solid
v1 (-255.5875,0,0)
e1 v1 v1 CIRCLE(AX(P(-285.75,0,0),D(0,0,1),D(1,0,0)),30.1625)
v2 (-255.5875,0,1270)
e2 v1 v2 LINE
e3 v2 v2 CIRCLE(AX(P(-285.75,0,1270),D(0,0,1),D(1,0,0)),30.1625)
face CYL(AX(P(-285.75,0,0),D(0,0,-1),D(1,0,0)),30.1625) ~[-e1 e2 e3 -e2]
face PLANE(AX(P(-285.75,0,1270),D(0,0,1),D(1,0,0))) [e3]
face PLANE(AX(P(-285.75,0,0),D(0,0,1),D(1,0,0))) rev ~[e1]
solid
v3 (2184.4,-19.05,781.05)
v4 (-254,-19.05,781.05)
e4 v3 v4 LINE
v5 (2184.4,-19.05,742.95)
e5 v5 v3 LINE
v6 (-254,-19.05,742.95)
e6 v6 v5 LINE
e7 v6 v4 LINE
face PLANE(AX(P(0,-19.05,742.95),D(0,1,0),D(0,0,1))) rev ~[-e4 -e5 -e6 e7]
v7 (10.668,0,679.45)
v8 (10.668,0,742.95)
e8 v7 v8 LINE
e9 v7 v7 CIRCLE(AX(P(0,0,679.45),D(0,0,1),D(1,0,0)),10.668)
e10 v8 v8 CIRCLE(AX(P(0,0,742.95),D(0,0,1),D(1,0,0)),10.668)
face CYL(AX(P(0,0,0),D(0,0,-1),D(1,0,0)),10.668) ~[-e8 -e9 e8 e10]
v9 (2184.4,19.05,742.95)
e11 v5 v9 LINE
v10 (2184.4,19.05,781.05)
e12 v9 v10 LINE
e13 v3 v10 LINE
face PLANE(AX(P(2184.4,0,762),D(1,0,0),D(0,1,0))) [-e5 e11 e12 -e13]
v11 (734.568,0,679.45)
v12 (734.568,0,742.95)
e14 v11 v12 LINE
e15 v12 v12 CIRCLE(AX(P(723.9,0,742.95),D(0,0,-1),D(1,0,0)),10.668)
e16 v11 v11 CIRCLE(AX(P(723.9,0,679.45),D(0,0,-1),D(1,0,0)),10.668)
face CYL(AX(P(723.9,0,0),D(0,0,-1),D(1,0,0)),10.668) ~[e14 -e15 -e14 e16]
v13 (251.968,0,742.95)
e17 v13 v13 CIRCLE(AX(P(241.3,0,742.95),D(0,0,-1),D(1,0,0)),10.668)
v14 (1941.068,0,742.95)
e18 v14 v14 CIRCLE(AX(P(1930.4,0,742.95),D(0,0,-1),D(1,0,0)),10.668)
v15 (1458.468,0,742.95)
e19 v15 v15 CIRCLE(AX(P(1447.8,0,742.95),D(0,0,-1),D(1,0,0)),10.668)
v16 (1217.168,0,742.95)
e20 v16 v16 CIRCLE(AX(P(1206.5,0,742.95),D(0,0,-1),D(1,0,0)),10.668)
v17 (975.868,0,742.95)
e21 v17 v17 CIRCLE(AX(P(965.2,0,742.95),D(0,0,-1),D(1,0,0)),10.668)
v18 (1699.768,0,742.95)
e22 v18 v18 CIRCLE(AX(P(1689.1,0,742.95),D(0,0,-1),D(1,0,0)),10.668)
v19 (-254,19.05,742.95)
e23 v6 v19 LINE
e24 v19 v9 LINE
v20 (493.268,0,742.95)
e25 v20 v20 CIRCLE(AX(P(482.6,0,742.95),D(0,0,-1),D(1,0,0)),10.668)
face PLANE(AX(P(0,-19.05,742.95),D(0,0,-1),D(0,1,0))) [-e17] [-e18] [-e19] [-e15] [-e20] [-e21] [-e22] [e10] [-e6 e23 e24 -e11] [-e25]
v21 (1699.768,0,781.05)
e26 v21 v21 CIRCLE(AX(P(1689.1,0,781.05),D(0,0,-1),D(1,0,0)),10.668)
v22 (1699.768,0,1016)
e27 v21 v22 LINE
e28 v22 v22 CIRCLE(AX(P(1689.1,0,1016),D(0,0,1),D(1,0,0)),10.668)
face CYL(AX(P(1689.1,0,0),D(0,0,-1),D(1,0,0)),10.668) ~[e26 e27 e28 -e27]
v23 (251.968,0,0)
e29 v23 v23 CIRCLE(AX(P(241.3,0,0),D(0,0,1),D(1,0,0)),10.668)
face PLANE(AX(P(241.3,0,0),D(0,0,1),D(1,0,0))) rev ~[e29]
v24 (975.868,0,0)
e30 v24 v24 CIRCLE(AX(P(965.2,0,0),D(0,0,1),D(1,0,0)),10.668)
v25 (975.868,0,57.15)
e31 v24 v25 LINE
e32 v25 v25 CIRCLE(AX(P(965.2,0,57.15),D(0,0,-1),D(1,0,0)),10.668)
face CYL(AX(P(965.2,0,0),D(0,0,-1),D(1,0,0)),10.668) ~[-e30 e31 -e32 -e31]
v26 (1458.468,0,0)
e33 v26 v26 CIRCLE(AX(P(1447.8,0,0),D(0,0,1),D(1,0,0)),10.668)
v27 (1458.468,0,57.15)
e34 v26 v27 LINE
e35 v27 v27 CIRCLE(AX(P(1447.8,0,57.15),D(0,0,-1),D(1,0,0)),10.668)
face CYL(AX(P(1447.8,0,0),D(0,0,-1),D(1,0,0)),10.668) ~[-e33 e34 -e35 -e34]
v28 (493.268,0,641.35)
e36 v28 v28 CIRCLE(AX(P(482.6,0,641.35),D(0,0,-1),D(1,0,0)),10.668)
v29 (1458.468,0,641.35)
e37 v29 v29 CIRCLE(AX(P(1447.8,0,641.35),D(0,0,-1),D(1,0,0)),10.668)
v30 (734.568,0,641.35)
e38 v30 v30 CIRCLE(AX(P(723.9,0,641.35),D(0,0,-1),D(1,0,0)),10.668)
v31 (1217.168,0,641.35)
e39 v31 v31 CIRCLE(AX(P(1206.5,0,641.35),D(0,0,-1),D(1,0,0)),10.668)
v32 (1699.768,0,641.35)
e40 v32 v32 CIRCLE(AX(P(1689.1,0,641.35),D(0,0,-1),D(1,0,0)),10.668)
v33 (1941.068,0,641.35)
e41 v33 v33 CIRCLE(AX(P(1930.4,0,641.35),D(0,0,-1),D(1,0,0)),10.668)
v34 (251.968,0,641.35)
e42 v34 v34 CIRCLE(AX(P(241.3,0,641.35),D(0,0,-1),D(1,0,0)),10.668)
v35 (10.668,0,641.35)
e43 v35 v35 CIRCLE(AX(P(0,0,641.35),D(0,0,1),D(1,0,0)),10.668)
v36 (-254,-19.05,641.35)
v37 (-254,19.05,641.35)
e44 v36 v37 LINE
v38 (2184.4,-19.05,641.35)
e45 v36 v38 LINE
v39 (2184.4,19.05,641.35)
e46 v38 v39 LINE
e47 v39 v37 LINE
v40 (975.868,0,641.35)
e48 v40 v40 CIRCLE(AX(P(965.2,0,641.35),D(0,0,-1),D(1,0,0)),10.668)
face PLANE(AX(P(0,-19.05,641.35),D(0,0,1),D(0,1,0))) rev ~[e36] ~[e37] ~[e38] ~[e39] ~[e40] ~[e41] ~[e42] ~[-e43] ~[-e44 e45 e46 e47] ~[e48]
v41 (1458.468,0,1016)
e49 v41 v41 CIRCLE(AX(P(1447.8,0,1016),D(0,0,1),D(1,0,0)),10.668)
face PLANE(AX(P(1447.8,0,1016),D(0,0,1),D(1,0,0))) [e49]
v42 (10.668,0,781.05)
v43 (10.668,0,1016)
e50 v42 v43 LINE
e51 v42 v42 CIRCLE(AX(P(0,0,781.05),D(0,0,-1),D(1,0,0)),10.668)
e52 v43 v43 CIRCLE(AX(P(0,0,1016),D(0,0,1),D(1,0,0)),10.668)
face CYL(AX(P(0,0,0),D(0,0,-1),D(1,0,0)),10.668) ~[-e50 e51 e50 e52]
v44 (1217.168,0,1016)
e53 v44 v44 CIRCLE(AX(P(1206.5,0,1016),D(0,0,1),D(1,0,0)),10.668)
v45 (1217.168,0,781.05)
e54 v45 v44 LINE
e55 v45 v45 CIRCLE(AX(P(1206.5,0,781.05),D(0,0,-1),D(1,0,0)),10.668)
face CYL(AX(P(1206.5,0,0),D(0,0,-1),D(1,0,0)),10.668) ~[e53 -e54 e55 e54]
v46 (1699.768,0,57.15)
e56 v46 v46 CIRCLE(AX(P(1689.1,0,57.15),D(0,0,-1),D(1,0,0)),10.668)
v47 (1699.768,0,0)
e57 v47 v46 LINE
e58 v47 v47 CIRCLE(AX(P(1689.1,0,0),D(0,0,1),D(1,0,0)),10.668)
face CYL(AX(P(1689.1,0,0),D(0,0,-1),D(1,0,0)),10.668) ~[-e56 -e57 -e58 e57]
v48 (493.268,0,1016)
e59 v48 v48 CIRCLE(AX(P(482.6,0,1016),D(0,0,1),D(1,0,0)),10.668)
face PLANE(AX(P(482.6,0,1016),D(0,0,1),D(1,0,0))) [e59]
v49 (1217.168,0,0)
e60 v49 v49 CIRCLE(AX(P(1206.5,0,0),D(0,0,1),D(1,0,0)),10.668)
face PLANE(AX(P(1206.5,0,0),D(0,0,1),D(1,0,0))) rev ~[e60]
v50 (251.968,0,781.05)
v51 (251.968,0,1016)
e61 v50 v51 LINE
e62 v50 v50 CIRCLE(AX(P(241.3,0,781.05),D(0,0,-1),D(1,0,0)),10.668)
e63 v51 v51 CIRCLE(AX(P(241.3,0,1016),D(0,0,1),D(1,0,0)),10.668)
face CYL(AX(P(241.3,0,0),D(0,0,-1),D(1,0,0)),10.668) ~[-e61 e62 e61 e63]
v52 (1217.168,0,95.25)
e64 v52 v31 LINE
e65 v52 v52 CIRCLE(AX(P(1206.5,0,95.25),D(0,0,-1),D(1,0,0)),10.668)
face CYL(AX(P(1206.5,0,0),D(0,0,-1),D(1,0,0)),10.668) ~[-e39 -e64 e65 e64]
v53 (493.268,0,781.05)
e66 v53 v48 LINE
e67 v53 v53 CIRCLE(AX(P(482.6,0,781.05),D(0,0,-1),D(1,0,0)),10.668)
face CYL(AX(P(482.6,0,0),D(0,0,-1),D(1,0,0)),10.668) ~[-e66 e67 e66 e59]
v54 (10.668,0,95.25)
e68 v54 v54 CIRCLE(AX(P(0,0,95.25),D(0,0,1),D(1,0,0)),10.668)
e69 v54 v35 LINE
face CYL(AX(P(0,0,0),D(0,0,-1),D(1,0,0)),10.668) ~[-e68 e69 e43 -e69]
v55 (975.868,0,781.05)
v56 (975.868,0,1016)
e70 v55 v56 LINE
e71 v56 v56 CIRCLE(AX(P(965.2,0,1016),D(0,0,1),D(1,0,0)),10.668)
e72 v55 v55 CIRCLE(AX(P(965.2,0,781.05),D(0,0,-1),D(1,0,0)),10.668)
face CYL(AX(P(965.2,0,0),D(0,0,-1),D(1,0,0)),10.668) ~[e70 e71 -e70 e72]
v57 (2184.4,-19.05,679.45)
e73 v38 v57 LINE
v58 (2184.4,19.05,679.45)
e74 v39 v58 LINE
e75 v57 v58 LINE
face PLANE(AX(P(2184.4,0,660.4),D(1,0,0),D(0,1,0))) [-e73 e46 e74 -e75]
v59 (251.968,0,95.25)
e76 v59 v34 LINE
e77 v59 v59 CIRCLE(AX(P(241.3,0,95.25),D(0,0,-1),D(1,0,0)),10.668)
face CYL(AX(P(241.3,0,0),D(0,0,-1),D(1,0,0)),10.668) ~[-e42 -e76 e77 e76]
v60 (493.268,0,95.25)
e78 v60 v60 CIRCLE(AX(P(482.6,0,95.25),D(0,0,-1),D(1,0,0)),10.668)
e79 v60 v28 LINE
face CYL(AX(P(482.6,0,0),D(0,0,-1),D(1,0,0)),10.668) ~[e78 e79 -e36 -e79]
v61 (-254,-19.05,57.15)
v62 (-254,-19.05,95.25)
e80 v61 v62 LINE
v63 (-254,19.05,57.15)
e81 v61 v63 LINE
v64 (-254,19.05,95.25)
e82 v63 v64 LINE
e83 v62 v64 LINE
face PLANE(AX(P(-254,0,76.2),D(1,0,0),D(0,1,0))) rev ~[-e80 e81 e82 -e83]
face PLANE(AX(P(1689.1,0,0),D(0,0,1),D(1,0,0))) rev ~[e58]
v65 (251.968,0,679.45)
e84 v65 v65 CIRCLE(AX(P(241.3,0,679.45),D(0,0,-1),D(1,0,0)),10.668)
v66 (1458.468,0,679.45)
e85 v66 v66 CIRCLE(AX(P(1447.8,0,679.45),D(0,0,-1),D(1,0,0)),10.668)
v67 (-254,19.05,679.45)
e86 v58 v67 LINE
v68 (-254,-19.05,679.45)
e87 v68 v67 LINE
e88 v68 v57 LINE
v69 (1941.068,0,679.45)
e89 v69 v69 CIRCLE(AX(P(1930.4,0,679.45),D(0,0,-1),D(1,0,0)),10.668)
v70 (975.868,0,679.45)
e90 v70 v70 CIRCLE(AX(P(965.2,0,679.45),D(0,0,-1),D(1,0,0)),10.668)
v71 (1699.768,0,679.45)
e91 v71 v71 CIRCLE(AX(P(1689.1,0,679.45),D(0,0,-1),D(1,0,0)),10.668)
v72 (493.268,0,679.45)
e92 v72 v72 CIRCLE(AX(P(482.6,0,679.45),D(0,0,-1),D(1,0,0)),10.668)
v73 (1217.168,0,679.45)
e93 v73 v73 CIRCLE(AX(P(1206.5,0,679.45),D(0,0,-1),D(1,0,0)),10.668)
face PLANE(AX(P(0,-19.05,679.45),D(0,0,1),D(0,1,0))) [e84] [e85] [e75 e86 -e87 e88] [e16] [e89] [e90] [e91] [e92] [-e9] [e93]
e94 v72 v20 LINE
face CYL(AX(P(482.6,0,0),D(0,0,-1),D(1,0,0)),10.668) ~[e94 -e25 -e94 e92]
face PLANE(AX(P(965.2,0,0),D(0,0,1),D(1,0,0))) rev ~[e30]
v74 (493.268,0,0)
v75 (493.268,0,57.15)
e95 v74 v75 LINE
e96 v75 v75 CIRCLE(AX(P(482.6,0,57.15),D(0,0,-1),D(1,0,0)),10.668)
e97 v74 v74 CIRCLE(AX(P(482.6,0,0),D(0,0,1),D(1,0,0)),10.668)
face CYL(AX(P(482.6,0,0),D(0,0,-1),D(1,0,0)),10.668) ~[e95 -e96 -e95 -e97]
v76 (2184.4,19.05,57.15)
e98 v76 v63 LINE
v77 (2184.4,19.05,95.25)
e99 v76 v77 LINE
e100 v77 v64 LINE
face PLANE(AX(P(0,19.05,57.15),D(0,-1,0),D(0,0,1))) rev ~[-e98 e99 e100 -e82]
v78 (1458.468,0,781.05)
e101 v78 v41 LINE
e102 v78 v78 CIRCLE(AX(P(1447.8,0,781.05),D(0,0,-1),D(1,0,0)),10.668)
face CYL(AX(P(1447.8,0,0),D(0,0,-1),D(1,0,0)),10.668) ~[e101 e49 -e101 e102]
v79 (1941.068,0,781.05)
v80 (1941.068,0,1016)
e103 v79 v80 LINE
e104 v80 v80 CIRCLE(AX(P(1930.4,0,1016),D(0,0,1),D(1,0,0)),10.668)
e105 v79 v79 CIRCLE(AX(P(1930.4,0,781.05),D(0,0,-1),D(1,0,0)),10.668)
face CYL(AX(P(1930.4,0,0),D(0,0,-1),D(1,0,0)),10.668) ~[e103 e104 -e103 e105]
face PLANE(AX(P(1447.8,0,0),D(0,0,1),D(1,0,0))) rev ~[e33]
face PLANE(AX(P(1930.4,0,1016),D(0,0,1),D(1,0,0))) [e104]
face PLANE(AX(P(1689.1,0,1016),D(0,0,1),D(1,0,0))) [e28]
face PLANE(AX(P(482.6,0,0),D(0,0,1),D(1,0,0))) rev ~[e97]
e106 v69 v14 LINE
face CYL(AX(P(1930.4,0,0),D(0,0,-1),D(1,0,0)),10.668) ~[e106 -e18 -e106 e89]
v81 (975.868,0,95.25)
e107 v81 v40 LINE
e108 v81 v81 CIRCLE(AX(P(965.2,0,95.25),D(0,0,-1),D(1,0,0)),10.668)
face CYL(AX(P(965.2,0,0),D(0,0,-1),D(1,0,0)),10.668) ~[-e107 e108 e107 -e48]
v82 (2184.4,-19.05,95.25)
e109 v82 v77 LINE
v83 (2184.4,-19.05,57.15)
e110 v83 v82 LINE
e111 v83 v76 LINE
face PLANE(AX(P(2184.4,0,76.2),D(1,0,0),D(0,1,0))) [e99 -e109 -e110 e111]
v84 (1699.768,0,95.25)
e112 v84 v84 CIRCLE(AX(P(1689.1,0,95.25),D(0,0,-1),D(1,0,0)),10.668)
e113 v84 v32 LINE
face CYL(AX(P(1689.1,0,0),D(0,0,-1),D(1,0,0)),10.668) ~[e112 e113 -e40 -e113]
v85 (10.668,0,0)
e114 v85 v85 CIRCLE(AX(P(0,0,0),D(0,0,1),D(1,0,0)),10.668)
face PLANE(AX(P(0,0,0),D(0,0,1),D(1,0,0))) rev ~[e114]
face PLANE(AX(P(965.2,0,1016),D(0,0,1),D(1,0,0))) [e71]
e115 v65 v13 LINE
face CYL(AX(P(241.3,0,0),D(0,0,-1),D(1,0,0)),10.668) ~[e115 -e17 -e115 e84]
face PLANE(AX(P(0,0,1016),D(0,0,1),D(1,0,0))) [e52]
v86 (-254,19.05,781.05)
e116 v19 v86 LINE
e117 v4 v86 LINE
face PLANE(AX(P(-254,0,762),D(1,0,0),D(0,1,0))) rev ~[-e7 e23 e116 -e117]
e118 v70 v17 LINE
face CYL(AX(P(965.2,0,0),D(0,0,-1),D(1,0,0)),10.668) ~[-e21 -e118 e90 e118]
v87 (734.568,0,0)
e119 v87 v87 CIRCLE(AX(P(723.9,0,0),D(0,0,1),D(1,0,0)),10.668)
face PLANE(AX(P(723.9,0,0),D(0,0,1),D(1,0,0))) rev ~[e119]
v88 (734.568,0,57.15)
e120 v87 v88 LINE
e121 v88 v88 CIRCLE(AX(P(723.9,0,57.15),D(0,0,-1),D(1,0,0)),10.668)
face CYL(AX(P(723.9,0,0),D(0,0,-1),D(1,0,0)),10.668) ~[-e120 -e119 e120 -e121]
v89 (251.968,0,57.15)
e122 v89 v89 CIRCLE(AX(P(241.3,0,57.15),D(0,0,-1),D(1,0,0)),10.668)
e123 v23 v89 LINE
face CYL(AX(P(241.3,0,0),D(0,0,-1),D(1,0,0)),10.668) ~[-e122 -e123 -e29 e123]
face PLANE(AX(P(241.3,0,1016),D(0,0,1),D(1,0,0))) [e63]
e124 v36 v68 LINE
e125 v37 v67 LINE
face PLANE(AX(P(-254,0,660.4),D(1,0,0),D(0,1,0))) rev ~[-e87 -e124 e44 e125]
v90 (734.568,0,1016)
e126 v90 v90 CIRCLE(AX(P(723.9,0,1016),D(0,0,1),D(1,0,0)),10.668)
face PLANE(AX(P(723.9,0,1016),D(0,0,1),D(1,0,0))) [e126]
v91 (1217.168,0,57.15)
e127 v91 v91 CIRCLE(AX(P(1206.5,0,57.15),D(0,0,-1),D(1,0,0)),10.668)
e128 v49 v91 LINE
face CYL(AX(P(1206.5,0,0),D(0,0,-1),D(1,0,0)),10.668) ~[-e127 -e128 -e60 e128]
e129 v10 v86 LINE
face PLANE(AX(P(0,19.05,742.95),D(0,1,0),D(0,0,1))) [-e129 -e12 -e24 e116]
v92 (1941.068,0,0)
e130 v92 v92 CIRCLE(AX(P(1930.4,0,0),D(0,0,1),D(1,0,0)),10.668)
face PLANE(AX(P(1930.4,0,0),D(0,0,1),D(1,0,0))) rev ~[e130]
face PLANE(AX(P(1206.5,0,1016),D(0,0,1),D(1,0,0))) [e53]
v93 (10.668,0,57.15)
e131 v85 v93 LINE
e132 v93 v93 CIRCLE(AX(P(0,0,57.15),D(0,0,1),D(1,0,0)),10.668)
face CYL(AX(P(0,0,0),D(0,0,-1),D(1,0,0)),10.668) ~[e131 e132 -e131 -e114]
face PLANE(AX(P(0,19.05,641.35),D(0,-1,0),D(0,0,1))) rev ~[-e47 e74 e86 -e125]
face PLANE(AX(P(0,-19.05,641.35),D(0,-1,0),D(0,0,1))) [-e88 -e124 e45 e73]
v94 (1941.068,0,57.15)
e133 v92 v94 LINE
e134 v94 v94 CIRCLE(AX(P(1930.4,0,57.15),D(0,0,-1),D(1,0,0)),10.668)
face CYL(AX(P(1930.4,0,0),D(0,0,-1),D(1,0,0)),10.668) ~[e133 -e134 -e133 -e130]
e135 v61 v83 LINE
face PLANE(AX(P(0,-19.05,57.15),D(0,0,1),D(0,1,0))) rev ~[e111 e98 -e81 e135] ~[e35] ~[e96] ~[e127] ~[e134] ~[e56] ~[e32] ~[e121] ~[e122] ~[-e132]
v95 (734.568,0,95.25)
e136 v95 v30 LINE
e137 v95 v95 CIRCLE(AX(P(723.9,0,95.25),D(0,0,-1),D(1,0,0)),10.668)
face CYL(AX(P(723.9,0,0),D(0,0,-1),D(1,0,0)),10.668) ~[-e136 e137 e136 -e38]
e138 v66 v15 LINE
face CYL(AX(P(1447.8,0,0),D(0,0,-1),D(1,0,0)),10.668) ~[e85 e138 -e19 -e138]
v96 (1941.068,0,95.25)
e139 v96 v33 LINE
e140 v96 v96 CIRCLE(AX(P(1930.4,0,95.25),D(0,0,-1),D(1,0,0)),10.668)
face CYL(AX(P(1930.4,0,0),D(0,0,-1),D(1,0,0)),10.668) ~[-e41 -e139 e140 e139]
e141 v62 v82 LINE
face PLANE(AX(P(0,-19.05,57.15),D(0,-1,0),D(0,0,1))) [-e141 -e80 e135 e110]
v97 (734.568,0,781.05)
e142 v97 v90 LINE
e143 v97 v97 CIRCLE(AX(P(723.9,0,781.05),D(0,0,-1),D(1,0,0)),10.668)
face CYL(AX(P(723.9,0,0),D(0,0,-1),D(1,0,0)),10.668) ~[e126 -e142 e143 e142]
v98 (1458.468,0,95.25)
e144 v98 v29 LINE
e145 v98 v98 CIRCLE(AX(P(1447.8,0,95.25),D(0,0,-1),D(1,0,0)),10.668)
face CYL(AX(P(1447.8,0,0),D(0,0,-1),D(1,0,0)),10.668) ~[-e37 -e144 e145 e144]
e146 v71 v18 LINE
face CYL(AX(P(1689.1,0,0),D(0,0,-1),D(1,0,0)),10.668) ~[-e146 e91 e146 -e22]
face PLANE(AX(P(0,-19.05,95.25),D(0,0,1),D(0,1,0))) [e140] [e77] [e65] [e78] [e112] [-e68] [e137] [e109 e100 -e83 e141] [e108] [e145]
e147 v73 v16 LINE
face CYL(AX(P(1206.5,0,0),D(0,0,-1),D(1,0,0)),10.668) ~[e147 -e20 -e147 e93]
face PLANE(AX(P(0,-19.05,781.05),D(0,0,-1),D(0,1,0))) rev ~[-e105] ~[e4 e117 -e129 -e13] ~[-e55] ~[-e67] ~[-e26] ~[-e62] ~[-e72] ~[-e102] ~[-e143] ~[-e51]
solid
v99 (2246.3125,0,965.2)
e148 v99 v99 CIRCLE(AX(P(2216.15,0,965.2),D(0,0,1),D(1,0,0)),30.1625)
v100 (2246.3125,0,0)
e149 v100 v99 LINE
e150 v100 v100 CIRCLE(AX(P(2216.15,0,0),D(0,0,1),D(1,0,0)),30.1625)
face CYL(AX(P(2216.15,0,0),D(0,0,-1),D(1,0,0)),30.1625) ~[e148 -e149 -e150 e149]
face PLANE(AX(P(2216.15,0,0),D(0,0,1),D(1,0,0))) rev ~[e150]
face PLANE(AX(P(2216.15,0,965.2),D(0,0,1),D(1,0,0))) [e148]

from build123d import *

# Parameters (mm, degrees)
F7_R           = 10.668
F9_DEPTH       = 1016
F10_DEPTH      = 1016
F11_DEPTH      = 1016
F8_W           = 38.1
F8_H           = 38.1
F12_DEPTH      = 2184.4
F12_DEPTH_BACK = 254
F7_R_2         = 30.1625
F13_DEPTH      = 1270
F14_DEPTH      = 965.2


# Not quite as in the source:
# - a variable given as a bare number and used for a length is read in inches; the dataset says mm whatever the document's units were
# - a feature names something its author has since deleted; it is built from what else it names


with BuildPart() as f9:
    # F7 (on Top) → F9 (new body)
    with BuildSketch(Plane.XY):
        Circle(F7_R)
    extrude(amount=F9_DEPTH)



with BuildPart() as f9b:
    # F7 (on Top) → F9, piece 2 (new body)
    with BuildSketch(Plane.XY):
        with Locations((965.2, 0)):
            Circle(F7_R)
    extrude(amount=F9_DEPTH)


with BuildPart() as f9c:
    # F7 (on Top) → F9, piece 3 (new body)
    with BuildSketch(Plane.XY):
        with Locations((1930.4, 0)):
            Circle(F7_R)
    extrude(amount=F9_DEPTH)


with BuildPart() as f10:
    # F7 (on Top) → F10 (new body)
    with BuildSketch(Plane.XY):
        with Locations((241.3, 0)):
            Circle(F7_R)
    extrude(amount=F10_DEPTH)


with BuildPart() as f10b:
    # F7 (on Top) → F10, piece 2 (new body)
    with BuildSketch(Plane.XY):
        with Locations((723.9, 0)):
            Circle(F7_R)
    extrude(amount=F10_DEPTH)


with BuildPart() as f10c:
    # F7 (on Top) → F10, piece 3 (new body)
    with BuildSketch(Plane.XY):
        with Locations((1206.5, 0)):
            Circle(F7_R)
    extrude(amount=F10_DEPTH)


with BuildPart() as f10d:
    # F7 (on Top) → F10, piece 4 (new body)
    with BuildSketch(Plane.XY):
        with Locations((1689.1, 0)):
            Circle(F7_R)
    extrude(amount=F10_DEPTH)


with BuildPart() as f11:
    # F7 (on Top) → F11 (new body)
    with BuildSketch(Plane.XY):
        with Locations((482.6, 0)):
            Circle(F7_R)
    extrude(amount=F11_DEPTH)


with BuildPart() as f11b:
    # F7 (on Top) → F11, piece 2 (new body)
    with BuildSketch(Plane.XY):
        with Locations((1447.8, 0)):
            Circle(F7_R)
    extrude(amount=F11_DEPTH)


with BuildPart() as f9_1:
    add(f9.part)

    add(f9b.part)  # F12 merges F9b

    add(f9c.part)  # F12 merges F9c

    add(f10.part)  # F12 merges F10

    add(f10b.part)  # F12 merges F10b

    add(f10c.part)  # F12 merges F10c

    add(f10d.part)  # F12 merges F10d

    add(f11.part)  # F12 merges F11

    add(f11b.part)  # F12 merges F11b
    # F8 (on Right) → F12 (join, two sides)
    with BuildSketch(Plane.YZ) as f12_sk:
        with Locations((0, 762)):
            Rectangle(F8_W, F8_H)
        with Locations((0, 660.4)):
            Rectangle(F8_W, F8_H)
        with Locations((0, 76.2)):
            Rectangle(F8_W, F8_H)
    extrude(amount=F12_DEPTH)
    extrude(f12_sk.sketch, amount=-F12_DEPTH_BACK)


with BuildPart() as f13:
    # F7 (on Top) → F13 (new body)
    with BuildSketch(Plane.XY):
        with Locations((-285.75, 0)):
            Circle(F7_R_2)
    extrude(amount=F13_DEPTH)


with BuildPart() as f14:
    # F7 (on Top) → F14 (new body)
    with BuildSketch(Plane.XY):
        with Locations((2216.15, 0)):
            Circle(F7_R_2)
    extrude(amount=F14_DEPTH)


solid = Compound([f9_1.part, f13.part, f14.part])
